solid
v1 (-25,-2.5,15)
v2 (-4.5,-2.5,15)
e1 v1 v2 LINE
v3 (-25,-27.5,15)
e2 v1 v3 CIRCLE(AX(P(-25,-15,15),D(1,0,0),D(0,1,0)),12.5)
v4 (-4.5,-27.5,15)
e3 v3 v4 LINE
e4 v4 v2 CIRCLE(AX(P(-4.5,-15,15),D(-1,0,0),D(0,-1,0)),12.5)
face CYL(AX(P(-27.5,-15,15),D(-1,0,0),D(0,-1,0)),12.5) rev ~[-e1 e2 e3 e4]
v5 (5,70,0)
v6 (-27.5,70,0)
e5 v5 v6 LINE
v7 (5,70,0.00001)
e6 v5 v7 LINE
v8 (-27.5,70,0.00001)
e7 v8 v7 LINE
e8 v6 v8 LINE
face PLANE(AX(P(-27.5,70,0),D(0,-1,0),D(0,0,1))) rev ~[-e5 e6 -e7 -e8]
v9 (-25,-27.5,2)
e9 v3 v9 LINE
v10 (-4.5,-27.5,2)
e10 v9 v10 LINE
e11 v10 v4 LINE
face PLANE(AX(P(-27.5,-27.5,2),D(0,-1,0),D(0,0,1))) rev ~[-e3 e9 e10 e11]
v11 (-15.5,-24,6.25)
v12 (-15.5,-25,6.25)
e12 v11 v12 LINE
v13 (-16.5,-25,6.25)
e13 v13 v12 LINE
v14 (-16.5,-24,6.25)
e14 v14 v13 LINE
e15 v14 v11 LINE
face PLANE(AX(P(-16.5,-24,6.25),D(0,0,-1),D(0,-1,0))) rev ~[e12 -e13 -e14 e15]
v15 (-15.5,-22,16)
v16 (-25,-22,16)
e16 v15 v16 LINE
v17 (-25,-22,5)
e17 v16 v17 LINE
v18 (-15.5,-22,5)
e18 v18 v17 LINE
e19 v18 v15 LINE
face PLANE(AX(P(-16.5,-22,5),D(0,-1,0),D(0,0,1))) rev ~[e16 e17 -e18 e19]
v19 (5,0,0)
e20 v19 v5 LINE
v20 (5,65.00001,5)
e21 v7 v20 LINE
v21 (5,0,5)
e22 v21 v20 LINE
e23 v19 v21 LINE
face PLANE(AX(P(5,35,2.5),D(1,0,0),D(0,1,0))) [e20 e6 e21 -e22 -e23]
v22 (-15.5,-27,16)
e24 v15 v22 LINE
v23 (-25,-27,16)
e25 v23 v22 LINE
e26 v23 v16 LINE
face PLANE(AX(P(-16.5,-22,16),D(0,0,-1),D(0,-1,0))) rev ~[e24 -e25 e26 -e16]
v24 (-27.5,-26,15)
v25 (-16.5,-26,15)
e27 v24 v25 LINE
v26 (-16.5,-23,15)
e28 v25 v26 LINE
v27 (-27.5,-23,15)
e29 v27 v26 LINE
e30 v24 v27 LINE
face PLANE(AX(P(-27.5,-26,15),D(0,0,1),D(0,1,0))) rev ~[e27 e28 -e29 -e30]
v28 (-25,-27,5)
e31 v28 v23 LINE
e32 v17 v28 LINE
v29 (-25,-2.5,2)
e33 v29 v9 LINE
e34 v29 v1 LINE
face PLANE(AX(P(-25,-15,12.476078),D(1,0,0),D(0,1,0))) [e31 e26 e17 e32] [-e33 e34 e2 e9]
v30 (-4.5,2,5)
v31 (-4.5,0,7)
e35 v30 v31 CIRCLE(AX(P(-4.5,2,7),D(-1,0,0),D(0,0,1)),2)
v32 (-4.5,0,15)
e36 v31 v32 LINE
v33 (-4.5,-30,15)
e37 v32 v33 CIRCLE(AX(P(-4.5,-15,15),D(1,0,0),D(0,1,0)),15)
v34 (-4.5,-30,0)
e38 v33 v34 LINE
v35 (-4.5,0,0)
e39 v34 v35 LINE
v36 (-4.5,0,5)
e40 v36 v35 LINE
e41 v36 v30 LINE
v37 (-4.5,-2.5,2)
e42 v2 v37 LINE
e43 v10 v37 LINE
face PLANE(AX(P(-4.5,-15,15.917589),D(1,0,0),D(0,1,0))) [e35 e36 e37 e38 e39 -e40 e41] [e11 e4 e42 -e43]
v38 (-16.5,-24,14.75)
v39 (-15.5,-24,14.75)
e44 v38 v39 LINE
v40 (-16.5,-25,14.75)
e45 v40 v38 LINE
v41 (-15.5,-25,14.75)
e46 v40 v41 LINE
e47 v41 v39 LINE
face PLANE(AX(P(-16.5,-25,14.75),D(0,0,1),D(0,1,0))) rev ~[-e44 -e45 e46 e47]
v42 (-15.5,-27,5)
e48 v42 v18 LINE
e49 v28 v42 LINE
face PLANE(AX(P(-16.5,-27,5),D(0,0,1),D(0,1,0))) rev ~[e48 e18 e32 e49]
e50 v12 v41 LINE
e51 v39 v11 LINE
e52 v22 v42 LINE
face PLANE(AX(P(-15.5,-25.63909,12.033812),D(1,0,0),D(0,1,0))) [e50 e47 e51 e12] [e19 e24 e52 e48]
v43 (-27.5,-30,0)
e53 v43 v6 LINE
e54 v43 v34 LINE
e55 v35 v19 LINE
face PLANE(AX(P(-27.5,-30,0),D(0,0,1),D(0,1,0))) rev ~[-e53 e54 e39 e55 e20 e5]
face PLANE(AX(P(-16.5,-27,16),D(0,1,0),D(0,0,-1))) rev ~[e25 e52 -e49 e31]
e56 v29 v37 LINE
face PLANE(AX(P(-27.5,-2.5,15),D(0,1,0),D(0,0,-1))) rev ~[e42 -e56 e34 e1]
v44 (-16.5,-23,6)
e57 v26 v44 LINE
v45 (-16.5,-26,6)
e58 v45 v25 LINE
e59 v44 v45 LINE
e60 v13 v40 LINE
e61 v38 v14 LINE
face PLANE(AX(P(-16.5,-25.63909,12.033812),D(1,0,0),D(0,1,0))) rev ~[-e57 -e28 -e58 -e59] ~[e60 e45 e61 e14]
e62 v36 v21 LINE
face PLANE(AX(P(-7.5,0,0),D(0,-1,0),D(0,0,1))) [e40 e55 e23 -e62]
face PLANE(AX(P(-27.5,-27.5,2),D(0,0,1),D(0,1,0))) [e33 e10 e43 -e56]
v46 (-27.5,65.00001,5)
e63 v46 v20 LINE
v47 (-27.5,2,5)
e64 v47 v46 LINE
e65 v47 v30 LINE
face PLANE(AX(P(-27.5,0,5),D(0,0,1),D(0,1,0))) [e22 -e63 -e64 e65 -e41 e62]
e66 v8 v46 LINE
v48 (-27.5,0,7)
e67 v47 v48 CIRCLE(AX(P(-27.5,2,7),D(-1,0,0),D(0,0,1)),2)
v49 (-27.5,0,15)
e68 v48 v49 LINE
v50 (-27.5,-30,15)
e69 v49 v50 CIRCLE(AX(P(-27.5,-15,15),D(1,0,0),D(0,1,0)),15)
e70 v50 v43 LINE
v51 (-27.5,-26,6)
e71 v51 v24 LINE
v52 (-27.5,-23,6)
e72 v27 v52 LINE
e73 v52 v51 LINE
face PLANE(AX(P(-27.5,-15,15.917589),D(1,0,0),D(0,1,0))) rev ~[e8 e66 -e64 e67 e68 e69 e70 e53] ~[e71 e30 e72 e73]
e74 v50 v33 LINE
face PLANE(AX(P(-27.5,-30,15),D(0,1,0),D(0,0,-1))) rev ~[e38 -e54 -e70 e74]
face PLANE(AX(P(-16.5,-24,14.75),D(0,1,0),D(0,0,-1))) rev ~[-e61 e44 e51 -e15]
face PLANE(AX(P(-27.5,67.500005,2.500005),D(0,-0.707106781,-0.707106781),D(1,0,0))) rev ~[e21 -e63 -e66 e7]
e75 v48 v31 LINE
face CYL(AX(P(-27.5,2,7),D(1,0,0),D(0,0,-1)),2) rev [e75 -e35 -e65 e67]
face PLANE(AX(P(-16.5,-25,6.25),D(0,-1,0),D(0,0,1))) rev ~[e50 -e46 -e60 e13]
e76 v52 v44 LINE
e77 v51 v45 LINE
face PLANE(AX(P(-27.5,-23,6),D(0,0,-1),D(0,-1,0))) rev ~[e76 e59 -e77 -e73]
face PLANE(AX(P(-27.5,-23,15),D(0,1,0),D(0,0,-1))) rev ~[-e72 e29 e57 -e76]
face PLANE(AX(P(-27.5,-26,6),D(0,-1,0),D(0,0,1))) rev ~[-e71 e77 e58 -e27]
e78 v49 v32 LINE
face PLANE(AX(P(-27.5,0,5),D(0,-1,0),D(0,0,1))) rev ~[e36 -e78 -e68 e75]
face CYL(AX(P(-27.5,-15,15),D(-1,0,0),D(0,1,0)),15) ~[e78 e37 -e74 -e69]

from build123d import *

# Parameters (mm, degrees)
F1_W      = 0.5
F1_H      = 7.5
F1_H_2    = 1
F2_DEPTH  = 11
F1_W_2    = 25
F1_H_3    = 2
F3_DEPTH  = 2.5
F6_DEPTH  = 1
F1_W_3    = 70
F1_H_4    = 5
F7_DEPTH  = 23
F9_W      = 70
F9_H      = 5
F10_DEPTH = 12.5
F11_SIZE  = 4.99999
F13_R     = 2


# Not quite as in the source:
# - a fillet or chamfer is up to 0.001 mm smaller than in the source, because OpenCascade refuses the exact size


with BuildPart() as f2:
    # F1 (on offset) → F2 (new body)
    with BuildSketch(Plane.YZ.offset(-27.5)):
        Polygon((-26, 6), (-26, 15), (-27, 15), (-27, 5), (-22, 5), (-22, 7.5), (-22.5, 7.5), (-22.5, 15), (-23, 15), (-23, 6), align=None)
        Polygon((-27, 15), (-26, 15), (-23, 15), (-22.5, 15), (-22.5, 16), (-27, 16), align=None)
        with Locations((-22.25, 11.25)):
            Rectangle(F1_W, F1_H)
        with Locations((-22.25, 15.5)):
            Rectangle(F1_W, F1_H_2)
    extrude(amount=F2_DEPTH)

    # F1 (on offset) → F3 (join)
    with BuildSketch(Plane.YZ.offset(-27.5)):
        with BuildLine():
            Line((-27.5, 2), (-2.5, 2))
            Line((-2.5, 2), (-2.5, 15))
            ThreePointArc((-2.5, 15), (-15, 27.5), (-27.5, 15))
            Line((-27.5, 15), (-27.5, 2))
        make_face()
        Polygon((-27, 5), (-27, 15), (-27, 16), (-22.5, 16), (-22.5, 22.5), (-7.5, 22.5), (-7.5, 7.5), (-22, 7.5), (-22, 5), align=None, mode=Mode.SUBTRACT)
        Polygon((-22, 16), (-22, 15), (-22, 7.5), (-7.5, 7.5), (-7.5, 22.5), (-22.5, 22.5), (-22.5, 16), align=None)
        with Locations((-15, 1)):
            Rectangle(F1_W_2, F1_H_3)
    extrude(amount=F3_DEPTH)

    # F5 (on offset) → F6 (join)
    with BuildSketch(Plane.YZ.offset(-16.5)):
        Polygon((-26, 14), (-26, 15), (-23, 15), (-23, 13.8), (-22, 16), (-27, 16), (-27, 5), (-26, 7.2), align=None)
        Polygon((-26, 6), (-26, 7.2), (-27, 5), (-25, 5), (-24, 5), (-22, 5), (-22, 16), (-23, 13.8), (-23, 6), align=None)
        Polygon((-23, 15), (-26, 15), (-26, 14), (-26, 7.2), (-25, 9.4), (-25, 14.75), (-24, 14.75), (-24, 11.6), (-23, 13.8), align=None)
        Polygon((-25, 9.4), (-26, 7.2), (-26, 6), (-23, 6), (-23, 13.8), (-24, 11.6), (-24, 6.25), (-25, 6.25), align=None)
    extrude(amount=F6_DEPTH)

    # F1 (on offset) → F7 (join)
    with BuildSketch(Plane.YZ.offset(-27.5)):
        with BuildLine():
            Line((-2.5, 0), (0, 0))
            Line((0, 0), (0, 5))
            Line((0, 5), (0, 15))
            ThreePointArc((0, 15), (-15, 30), (-30, 15))
            Line((-30, 15), (-30, 0))
            Line((-30, 0), (-27.5, 0))
            Line((-27.5, 0), (-27.5, 2))
            Line((-27.5, 2), (-27.5, 15))
            ThreePointArc((-27.5, 15), (-15, 27.5), (-2.5, 15))
            Line((-2.5, 15), (-2.5, 2))
            Line((-2.5, 2), (-2.5, 0))
        make_face()
        with Locations((35, 2.5)):
            Rectangle(F1_W_3, F1_H_4)
        with Locations((-15, 1)):
            Rectangle(F1_W_2, F1_H_3)
    extrude(amount=F7_DEPTH)

    # F9 (on offset) → F10 (join)
    with BuildSketch(Plane.YZ.offset(-7.5)):
        with Locations((35, 2.5)):
            Rectangle(F9_W, F9_H)
    extrude(amount=F10_DEPTH)

    # F11 (size 5 in the source; OpenCascade refuses exactly that, so slightly less here)
    f11_edges = [f2.edges().sort_by_distance(p)[0] for p in [
        (-11.25, 70, 5),
    ]]
    chamfer(f11_edges, length=F11_SIZE)

    # F13
    f13_edges = [f2.edges().sort_by_distance(p)[0] for p in [
        (-16, 0, 5),
    ]]
    fillet(f13_edges, radius=F13_R)


solid = f2.part
